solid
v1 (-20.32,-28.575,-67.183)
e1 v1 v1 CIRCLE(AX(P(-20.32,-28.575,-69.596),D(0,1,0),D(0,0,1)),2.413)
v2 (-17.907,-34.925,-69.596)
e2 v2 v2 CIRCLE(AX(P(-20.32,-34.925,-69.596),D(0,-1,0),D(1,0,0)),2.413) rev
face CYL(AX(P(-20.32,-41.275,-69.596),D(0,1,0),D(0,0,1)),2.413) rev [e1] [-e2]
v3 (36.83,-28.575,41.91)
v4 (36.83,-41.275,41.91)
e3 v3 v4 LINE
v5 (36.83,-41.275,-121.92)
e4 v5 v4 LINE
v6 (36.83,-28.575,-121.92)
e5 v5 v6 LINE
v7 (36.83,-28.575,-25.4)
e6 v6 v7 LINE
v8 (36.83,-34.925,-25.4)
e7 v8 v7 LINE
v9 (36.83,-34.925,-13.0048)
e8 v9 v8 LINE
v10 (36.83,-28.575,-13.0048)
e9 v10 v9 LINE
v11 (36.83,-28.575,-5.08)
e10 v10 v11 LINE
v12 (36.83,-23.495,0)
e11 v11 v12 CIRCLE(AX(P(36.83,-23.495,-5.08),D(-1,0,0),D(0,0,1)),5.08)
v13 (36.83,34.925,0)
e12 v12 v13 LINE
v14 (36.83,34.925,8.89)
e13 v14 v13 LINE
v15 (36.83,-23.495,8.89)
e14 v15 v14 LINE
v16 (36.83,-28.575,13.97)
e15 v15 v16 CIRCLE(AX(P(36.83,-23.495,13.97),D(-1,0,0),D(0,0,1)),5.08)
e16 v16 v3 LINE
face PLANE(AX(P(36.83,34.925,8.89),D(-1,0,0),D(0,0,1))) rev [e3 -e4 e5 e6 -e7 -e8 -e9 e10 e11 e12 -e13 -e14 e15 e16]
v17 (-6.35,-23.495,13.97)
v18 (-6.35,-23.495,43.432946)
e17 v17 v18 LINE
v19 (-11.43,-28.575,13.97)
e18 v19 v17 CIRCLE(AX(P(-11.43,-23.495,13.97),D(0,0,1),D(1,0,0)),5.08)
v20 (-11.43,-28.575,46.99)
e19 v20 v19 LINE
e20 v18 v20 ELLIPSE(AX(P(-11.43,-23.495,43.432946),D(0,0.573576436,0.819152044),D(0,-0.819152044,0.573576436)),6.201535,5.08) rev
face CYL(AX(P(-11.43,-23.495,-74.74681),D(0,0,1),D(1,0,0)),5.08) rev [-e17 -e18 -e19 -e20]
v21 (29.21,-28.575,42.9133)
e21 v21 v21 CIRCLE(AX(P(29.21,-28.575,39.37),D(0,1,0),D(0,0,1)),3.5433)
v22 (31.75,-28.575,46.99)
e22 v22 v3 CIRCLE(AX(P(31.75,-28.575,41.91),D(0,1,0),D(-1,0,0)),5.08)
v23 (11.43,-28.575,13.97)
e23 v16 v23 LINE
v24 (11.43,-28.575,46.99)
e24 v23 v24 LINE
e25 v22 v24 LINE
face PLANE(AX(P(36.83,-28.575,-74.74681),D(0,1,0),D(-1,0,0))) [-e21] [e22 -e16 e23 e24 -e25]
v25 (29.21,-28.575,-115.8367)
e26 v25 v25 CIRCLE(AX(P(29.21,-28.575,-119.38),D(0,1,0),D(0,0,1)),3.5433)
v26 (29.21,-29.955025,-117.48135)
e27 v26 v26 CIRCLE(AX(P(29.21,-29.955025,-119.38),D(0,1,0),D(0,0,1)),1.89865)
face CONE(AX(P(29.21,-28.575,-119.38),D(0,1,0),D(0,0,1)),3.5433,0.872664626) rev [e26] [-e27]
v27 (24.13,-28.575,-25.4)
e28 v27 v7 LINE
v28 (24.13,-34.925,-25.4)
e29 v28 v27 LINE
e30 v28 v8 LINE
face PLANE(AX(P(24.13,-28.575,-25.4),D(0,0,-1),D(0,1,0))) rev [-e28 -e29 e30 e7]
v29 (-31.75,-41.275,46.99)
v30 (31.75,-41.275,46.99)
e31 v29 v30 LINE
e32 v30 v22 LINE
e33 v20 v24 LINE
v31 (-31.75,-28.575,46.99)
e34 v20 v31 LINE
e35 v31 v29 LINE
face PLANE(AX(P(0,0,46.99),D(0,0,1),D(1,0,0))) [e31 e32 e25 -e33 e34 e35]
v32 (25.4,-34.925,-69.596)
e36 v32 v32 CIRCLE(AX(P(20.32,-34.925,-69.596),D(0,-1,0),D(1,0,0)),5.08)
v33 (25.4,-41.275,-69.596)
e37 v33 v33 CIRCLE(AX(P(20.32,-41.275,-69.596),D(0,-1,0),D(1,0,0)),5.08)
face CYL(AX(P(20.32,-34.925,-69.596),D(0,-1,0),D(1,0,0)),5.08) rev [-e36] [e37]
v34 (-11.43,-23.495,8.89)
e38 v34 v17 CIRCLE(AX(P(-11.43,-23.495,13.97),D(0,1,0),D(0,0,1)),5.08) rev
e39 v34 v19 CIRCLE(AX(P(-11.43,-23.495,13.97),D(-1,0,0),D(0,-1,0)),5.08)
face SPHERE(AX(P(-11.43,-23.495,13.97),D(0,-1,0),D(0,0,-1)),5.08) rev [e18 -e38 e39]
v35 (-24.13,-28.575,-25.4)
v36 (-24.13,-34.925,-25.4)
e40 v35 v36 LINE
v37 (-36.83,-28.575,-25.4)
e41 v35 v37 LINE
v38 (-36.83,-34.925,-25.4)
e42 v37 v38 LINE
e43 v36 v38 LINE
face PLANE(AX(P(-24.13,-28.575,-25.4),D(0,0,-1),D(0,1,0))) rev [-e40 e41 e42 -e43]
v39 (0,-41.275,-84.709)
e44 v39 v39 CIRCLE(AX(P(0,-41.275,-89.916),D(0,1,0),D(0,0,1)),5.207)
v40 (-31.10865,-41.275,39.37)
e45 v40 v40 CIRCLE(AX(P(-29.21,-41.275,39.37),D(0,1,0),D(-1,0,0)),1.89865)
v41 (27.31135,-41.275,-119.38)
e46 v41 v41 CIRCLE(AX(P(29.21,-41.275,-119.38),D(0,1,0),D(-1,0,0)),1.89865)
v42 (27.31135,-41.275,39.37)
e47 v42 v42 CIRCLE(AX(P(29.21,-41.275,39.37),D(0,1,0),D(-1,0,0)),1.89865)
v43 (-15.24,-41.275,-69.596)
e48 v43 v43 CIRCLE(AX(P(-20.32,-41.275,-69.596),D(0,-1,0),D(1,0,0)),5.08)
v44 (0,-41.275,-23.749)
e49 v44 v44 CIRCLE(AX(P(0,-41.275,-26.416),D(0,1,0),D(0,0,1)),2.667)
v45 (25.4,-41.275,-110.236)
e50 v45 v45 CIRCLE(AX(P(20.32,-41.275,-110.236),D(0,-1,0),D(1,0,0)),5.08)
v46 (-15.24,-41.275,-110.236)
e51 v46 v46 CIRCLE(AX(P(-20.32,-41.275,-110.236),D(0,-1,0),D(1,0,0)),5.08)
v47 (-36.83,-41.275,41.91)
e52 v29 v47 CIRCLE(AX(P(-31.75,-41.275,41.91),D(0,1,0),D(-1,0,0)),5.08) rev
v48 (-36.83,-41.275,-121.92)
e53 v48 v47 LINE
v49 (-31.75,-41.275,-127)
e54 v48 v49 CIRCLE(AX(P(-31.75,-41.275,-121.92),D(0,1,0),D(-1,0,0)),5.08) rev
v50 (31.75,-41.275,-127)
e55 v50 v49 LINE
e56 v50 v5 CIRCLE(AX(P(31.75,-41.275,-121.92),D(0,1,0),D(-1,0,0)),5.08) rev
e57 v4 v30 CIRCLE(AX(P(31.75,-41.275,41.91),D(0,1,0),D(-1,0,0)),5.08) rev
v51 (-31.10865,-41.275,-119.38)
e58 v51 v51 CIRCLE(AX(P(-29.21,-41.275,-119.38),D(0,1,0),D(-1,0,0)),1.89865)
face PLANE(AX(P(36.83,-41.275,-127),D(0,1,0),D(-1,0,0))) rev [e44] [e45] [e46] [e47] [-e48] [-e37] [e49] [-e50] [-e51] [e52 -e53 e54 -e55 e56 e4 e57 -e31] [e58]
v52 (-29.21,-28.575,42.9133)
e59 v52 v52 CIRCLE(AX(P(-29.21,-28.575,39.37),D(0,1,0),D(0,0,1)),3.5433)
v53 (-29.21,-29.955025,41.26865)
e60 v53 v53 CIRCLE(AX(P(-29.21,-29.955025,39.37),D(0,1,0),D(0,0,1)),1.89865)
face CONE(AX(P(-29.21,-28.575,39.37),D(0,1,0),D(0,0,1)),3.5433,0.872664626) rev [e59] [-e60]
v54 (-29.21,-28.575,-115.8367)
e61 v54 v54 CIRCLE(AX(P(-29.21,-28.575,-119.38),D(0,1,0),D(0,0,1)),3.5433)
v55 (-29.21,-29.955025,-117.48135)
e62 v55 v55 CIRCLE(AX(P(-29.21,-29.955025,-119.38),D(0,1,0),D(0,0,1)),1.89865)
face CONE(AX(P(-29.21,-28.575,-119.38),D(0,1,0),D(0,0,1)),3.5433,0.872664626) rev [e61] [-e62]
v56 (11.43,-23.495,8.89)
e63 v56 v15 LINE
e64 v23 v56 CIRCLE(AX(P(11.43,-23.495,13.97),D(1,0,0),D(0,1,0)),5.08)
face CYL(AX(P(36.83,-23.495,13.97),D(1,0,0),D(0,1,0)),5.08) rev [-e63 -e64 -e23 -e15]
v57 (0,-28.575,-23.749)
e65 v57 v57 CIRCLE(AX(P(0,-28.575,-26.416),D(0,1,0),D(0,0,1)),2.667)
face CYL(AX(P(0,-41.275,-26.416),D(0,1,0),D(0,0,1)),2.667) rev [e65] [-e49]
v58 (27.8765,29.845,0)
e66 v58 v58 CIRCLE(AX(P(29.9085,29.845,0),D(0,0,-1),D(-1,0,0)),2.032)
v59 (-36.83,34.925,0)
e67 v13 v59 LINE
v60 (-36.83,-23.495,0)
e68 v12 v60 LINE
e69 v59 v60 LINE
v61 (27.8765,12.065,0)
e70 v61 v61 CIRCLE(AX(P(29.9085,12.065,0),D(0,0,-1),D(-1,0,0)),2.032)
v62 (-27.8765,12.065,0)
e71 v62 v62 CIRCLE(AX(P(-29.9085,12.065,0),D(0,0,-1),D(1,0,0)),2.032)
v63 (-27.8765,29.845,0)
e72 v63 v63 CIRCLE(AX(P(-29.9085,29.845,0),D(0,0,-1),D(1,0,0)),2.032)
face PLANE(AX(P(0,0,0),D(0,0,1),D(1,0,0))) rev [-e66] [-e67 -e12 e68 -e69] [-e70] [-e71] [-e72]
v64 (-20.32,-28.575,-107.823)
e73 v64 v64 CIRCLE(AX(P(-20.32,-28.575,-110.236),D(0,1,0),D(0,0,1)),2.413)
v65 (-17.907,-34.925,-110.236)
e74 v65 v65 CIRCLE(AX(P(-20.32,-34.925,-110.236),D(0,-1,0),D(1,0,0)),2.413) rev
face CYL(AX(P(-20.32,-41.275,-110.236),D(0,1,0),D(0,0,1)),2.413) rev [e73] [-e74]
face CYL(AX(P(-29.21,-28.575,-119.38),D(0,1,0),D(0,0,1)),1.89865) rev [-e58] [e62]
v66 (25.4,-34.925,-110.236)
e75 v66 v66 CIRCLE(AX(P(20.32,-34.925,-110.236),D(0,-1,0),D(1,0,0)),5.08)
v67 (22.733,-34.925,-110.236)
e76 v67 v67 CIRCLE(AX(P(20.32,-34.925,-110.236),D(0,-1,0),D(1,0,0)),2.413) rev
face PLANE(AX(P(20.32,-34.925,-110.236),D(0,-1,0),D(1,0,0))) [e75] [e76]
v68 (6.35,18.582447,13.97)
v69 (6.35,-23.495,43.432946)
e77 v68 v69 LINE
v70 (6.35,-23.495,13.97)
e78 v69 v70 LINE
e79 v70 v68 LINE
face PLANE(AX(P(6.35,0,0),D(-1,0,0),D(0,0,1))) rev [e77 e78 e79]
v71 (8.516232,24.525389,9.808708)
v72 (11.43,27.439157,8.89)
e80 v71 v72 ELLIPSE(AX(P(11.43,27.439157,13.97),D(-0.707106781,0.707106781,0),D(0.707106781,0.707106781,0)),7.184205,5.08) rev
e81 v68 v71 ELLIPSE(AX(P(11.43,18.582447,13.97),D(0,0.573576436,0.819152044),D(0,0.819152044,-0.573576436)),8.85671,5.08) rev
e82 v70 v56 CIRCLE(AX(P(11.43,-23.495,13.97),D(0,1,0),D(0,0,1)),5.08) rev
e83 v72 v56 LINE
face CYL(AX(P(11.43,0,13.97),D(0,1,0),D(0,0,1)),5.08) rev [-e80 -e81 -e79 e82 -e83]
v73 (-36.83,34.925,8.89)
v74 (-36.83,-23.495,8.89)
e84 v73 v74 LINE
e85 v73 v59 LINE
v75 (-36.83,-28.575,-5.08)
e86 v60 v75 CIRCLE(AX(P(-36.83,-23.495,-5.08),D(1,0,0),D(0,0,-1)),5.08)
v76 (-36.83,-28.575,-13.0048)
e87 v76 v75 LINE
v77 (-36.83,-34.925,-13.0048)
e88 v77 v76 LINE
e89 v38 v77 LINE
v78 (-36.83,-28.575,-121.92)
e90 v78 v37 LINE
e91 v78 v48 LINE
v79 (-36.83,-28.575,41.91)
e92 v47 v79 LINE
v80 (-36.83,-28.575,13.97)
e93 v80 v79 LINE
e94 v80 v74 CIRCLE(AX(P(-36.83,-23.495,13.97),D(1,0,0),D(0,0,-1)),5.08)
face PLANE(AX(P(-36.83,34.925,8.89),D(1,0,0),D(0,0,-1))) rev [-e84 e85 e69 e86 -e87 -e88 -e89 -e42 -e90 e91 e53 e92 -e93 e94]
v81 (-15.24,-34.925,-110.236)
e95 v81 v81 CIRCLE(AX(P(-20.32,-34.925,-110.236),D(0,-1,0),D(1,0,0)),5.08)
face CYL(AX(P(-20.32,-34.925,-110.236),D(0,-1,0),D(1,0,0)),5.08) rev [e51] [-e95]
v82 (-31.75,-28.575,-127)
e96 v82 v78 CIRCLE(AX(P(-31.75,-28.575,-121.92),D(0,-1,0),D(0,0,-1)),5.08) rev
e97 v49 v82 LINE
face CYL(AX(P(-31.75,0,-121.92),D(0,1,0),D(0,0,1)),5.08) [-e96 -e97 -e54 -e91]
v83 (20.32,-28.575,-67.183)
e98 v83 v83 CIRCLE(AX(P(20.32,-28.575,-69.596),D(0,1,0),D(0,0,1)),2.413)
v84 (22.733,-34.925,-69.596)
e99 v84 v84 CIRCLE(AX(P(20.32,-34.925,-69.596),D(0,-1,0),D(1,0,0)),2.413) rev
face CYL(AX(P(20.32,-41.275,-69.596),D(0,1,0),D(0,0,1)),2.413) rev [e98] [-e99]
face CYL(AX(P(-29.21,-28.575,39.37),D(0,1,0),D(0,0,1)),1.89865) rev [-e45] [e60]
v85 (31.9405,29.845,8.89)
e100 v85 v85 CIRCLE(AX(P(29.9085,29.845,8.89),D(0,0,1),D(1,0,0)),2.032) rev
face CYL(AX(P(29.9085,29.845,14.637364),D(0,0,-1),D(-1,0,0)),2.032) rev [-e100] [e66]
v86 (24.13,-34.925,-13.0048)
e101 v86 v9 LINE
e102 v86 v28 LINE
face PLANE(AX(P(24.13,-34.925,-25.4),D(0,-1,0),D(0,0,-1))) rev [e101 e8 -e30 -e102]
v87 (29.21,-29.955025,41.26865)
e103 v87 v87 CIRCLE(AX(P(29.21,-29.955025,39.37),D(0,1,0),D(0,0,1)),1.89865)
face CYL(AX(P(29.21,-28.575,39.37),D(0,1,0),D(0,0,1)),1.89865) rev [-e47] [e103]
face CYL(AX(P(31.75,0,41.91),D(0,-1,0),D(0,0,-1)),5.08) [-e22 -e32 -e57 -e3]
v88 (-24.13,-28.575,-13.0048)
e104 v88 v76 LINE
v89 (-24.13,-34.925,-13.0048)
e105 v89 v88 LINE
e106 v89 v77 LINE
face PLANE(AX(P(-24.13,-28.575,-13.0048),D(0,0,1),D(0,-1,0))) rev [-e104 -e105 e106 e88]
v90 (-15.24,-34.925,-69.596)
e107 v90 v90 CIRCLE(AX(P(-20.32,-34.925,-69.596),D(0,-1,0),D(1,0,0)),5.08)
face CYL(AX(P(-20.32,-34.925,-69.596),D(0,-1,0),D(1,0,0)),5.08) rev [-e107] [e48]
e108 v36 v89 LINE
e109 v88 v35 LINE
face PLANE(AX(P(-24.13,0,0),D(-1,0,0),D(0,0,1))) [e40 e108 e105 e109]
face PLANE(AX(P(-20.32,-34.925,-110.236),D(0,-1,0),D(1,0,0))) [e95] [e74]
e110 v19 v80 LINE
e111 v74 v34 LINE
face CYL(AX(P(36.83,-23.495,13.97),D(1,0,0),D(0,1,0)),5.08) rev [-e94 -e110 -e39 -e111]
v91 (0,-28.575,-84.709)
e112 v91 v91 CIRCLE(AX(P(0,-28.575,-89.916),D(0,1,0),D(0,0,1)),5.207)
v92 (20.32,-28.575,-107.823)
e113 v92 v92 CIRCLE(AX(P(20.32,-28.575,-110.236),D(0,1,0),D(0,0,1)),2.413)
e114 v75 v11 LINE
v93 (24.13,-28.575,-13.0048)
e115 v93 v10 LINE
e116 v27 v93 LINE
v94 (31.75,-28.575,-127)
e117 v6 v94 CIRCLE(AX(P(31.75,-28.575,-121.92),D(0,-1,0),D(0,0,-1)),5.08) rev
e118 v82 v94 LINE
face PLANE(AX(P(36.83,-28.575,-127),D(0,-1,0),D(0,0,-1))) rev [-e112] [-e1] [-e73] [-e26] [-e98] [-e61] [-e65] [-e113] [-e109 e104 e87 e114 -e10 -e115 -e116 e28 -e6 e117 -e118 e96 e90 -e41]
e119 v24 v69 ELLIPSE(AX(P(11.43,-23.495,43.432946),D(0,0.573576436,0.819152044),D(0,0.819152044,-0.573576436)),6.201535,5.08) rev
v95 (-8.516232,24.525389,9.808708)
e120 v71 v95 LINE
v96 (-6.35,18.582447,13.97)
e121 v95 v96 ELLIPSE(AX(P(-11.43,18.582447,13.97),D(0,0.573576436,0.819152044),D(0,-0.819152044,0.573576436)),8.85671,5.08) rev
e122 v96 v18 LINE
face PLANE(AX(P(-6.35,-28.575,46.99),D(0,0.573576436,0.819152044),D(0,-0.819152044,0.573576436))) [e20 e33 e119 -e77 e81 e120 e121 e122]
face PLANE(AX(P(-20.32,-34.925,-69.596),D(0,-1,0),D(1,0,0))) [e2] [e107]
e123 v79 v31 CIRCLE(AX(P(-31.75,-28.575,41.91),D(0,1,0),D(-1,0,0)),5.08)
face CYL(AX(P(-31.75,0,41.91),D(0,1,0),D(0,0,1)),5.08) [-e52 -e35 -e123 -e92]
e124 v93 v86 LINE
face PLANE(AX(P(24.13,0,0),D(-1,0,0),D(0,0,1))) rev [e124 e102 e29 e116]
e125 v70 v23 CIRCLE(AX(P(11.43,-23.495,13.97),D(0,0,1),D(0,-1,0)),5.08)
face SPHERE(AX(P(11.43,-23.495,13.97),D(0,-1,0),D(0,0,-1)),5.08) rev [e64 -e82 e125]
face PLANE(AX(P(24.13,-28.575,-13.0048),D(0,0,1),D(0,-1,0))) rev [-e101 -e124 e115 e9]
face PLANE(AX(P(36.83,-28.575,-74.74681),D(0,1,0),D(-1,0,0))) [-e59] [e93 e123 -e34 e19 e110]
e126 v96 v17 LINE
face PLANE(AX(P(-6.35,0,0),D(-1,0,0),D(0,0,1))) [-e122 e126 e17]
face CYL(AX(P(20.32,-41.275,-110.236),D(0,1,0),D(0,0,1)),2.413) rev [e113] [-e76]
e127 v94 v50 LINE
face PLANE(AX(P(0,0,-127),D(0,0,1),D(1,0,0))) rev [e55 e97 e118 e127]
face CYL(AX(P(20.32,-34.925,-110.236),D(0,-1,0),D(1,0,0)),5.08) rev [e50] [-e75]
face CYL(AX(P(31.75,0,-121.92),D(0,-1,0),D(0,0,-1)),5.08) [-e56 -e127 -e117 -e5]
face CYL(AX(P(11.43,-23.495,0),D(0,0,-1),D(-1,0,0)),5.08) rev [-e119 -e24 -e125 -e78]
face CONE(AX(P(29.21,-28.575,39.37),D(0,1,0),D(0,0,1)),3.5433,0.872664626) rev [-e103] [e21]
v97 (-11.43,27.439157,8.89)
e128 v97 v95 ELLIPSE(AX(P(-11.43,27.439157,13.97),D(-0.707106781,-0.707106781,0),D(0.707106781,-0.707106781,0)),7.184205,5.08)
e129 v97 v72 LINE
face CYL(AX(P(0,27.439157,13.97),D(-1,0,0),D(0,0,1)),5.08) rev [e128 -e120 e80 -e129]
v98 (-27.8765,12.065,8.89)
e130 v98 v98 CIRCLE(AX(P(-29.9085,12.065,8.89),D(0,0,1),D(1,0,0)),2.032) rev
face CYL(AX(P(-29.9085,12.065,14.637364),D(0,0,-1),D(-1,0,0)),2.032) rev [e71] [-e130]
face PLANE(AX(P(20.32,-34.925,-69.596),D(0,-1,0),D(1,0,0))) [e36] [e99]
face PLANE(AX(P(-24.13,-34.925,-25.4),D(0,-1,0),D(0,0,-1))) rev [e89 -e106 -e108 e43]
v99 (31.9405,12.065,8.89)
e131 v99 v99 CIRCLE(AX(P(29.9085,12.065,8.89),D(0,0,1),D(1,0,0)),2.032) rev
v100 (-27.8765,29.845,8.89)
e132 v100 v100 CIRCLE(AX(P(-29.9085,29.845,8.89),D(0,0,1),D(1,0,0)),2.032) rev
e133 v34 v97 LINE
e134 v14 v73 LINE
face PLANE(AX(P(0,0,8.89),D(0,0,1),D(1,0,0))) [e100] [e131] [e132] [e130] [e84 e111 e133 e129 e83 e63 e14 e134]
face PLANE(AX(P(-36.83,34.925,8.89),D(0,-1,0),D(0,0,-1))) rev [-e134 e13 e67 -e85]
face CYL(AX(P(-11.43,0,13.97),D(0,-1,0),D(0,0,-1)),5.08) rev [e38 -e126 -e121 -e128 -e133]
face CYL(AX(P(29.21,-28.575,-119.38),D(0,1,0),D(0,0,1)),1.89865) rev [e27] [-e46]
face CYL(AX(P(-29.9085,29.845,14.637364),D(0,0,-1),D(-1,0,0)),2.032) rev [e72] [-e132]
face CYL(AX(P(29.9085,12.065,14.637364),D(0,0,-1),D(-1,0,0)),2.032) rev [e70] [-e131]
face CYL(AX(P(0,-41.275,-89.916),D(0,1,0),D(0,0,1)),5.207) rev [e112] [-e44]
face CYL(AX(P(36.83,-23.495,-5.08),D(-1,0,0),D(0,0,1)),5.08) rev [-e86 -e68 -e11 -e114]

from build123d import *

# Parameters (mm, degrees)
SKETCH1_W                                         = 73.66
SKETCH1_H                                         = 69.85
BOSS_EXTRUDE1_DEPTH                               = 8.89
SKETCH2_R                                         = 2.032
CUT_EXTRUDE1_DEPTH                                = 8.89
SKETCH3_W                                         = 73.66
SKETCH3_H                                         = 12.7
BOSS_EXTRUDE2_DEPTH                               = 127
BOSS_EXTRUDE3_DEPTH                               = 38.1
BOSS_EXTRUDE3_DEPTH_BACK                          = 135.89
SKETCH4_W                                         = 73.66
SKETCH4_H                                         = 12.7
BOSS_EXTRUDE4_START                               = -36.83
BOSS_EXTRUDE4_DEPTH                               = 6.35
SKETCH7_R                                         = 2.667
SKETCH7_R_2                                       = 5.207
SKETCH7_R_3                                       = 2.413
CUT_EXTRUDE2_DEPTH                                = 12.7
SKETCH27_W                                        = 12.3952
SKETCH27_H                                        = 6.35
CUT_EXTRUDE3_DEPTH                                = 12.7
SKETCH28_W                                        = 12.3952
SKETCH28_H                                        = 6.35
CUT_EXTRUDE4_DEPTH                                = 12.7
CSK_FOR_6_FLAT_HEAD_MACHINE_SCREW_100_D           = 3.7973
CSK_FOR_6_FLAT_HEAD_MACHINE_SCREW_100_CSINK_D     = 7.0866
CSK_FOR_6_FLAT_HEAD_MACHINE_SCREW_100_CSINK_ANGLE = 100
FILLET1_R                                         = 5.08
SKETCH35_R                                        = 5.08
CUT_EXTRUDE5_DEPTH                                = 6.35


with BuildPart() as part:
    # Sketch1 → Boss-Extrude1 (new body)
    with BuildSketch(Plane.XY):
        Rectangle(SKETCH1_W, SKETCH1_H)
    extrude(amount=BOSS_EXTRUDE1_DEPTH)

    # Sketch2 → Cut-Extrude1 (cut)
    with BuildSketch(Plane(origin=(0, 0, 0), x_dir=(-1, 0, 0), z_dir=(0, 0, -1))):
        with Locations((-29.9085, 29.845)):
            Circle(SKETCH2_R)
        with Locations((-29.9085, 12.065)):
            Circle(SKETCH2_R)
        with Locations(Location((29.9085, 12.065, 0), (0, 0, 180))):
            Circle(SKETCH2_R)
        with Locations(Location((29.9085, 29.845, 0), (0, 0, 180))):
            Circle(SKETCH2_R)
    extrude(amount=-CUT_EXTRUDE1_DEPTH, mode=Mode.SUBTRACT)

    # Sketch3 → Boss-Extrude2 (add)
    with BuildSketch(Plane(origin=(0, 0, 0), x_dir=(-1, 0, 0), z_dir=(0, 0, -1))):
        with Locations((0, -34.925)):
            Rectangle(SKETCH3_W, SKETCH3_H)
    extrude(amount=BOSS_EXTRUDE2_DEPTH)

    # Sketch4 → Boss-Extrude3 (add, two sides: drawn at the far end of the back side and taken through both)
    with BuildSketch(Plane.XY.offset(8.89).offset(-BOSS_EXTRUDE3_DEPTH_BACK)):
        with Locations((0, -34.925)):
            Rectangle(SKETCH4_W, SKETCH4_H)
    extrude(amount=BOSS_EXTRUDE3_DEPTH + BOSS_EXTRUDE3_DEPTH_BACK)

    # Sketch5 → Boss-Extrude4 (add, symmetric)
    with BuildSketch(Plane(origin=(36.83, 0, 0), x_dir=(0, 0, -1), z_dir=(1, 0, 0)).offset(BOSS_EXTRUDE4_START)):
        Polygon((-46.99, -28.575), (-8.89, 25.837439057), (-8.89, -28.575), align=None)
    extrude(amount=BOSS_EXTRUDE4_DEPTH, both=True)

    # Sketch7 → Cut-Extrude2 (cut)
    with BuildSketch(Plane(origin=(0, -28.575, 0), x_dir=(1, 0, 0), z_dir=(0, 1, 0))):
        with Locations(Location((0, 26.416, 0), (0, 0, 270))):
            Circle(SKETCH7_R)
        with Locations(Location((0, 89.916, 0), (0, 0, 270))):
            Circle(SKETCH7_R_2)
        with Locations(Location((-20.32, 69.596, 0), (0, 0, 270))):
            Circle(SKETCH7_R_3)
        with Locations(Location((20.32, 69.596, 0), (0, 0, 270))):
            Circle(SKETCH7_R_3)
        with Locations(Location((20.32, 110.236, 0), (0, 0, 270))):
            Circle(SKETCH7_R_3)
        with Locations(Location((-20.32, 110.236, 0), (0, 0, 270))):
            Circle(SKETCH7_R_3)
    extrude(amount=-CUT_EXTRUDE2_DEPTH, mode=Mode.SUBTRACT)

    # Sketch27 → Cut-Extrude3 (cut)
    with BuildSketch(Plane.ZY.offset(36.83)):
        with Locations((-19.2024, -31.75)):
            Rectangle(SKETCH27_W, SKETCH27_H)
    extrude(amount=-CUT_EXTRUDE3_DEPTH, mode=Mode.SUBTRACT)

    # Sketch28 → Cut-Extrude4 (cut)
    with BuildSketch(Plane(origin=(36.83, 0, 0), x_dir=(0, 0, -1), z_dir=(1, 0, 0))):
        with Locations((19.2024, -31.75)):
            Rectangle(SKETCH28_W, SKETCH28_H)
    extrude(amount=-CUT_EXTRUDE4_DEPTH, mode=Mode.SUBTRACT)

    # CSK for #6 Flat Head Machine Screw (100)1 (through all)
    with Locations(Plane(origin=(0, -28.575, 0), x_dir=(1, 0, 0), z_dir=(0, 1, 0))):
        with Locations((-29.21, -39.37), (29.21, -39.37), (29.21, 119.38), (-29.21, 119.38)):
            CounterSinkHole(CSK_FOR_6_FLAT_HEAD_MACHINE_SCREW_100_D / 2, CSK_FOR_6_FLAT_HEAD_MACHINE_SCREW_100_CSINK_D / 2, counter_sink_angle=CSK_FOR_6_FLAT_HEAD_MACHINE_SCREW_100_CSINK_ANGLE)

    # Fillet1
    fillet1_edges = [part.edges().sort_by_distance(p)[0] for p in [
        (0, -28.575, 0),
    ]]
    fillet(fillet1_edges, radius=FILLET1_R)
    fillet1_2_edges = [part.edges().sort_by_distance(p)[0] for p in [
        (-6.35, -1.368780472, 8.89),
    ]]
    fillet(fillet1_2_edges, radius=FILLET1_R)
    fillet1_3_edges = [part.edges().sort_by_distance(p)[0] for p in [
        (6.35, -1.368780472, 8.89),
    ]]
    fillet(fillet1_3_edges, radius=FILLET1_R)
    fillet1_4_edges = [part.edges().sort_by_distance(p)[0] for p in [
        (0, 25.837439057, 8.89),
    ]]
    fillet(fillet1_4_edges, radius=FILLET1_R)
    fillet1_5_edges = [part.edges().sort_by_distance(p)[0] for p in [
        (36.83, -34.925, -127),
    ]]
    fillet(fillet1_5_edges, radius=FILLET1_R)
    fillet1_6_edges = [part.edges().sort_by_distance(p)[0] for p in [
        (36.83, -34.925, 46.99),
    ]]
    fillet(fillet1_6_edges, radius=FILLET1_R)
    fillet1_7_edges = [part.edges().sort_by_distance(p)[0] for p in [
        (-36.83, -34.925, 46.99),
    ]]
    fillet(fillet1_7_edges, radius=FILLET1_R)
    fillet1_8_edges = [part.edges().sort_by_distance(p)[0] for p in [
        (-36.83, -34.925, -127),
    ]]
    fillet(fillet1_8_edges, radius=FILLET1_R)
    # the kernel refuses this fillet: 5.08 mm, written as the material it adds along each edge
    with BuildSketch(Plane(origin=(6.35, -28.575, 13.97), x_dir=(1, 0, 0), z_dir=(0, 0, 1))) as fillet1_9_piece_1_section:
        with BuildLine():
            CenterArc((FILLET1_R, FILLET1_R), FILLET1_R, 180, 90)
            Line((0, FILLET1_R), (-FILLET1_R * 0.02, FILLET1_R))
            Line((-FILLET1_R * 0.02, FILLET1_R), (-FILLET1_R * 0.02, -FILLET1_R * 0.02))
            Line((-FILLET1_R * 0.02, -FILLET1_R * 0.02), (FILLET1_R, -FILLET1_R * 0.02))
            Line((FILLET1_R, -FILLET1_R * 0.02), (FILLET1_R, 0))
        make_face()
    fillet1_9_piece_1 = extrude(amount=33.02, mode=Mode.PRIVATE)
    fillet1_9_piece_1 = split(fillet1_9_piece_1, bisect_by=Plane(origin=(7.515371232, -19.877941852, 40.900254324), z_dir=(0, -0.5735764363510472, -0.8191520442889911)), keep=Keep.TOP, mode=Mode.PRIVATE)
    add(fillet1_9_piece_1)
    with BuildSketch(Plane(origin=(11.43, -28.575, 13.97), x_dir=(0, 0, -1), z_dir=(1, 0, 0))) as fillet1_9_piece_2:
        with BuildLine():
            CenterArc((5.08 - FILLET1_R, FILLET1_R), FILLET1_R, 270, 90)
            Line((5.08, FILLET1_R), (5.08 + FILLET1_R * 0.02, FILLET1_R))
            Line((5.08 + FILLET1_R * 0.02, FILLET1_R), (5.08 + FILLET1_R * 0.02, 0))
            Line((5.08 + FILLET1_R * 0.02, 0), (5.08, -FILLET1_R * 0.02))
            Line((5.08, -FILLET1_R * 0.02), (5.08 - FILLET1_R, -FILLET1_R * 0.02))
            Line((5.08 - FILLET1_R, -FILLET1_R * 0.02), (5.08 - FILLET1_R, 0))
        make_face()
    revolve(axis=Axis((11.43, -28.575, 13.97), (0, 1, 0)), revolution_arc=90)
    with BuildSketch(Plane(origin=(11.43, -28.575, 8.89), x_dir=(0, 1, 0), z_dir=(1, 0, 0))) as fillet1_9_piece_3:
        with BuildLine():
            CenterArc((FILLET1_R, FILLET1_R), FILLET1_R, 180, 90)
            Line((0, FILLET1_R), (-FILLET1_R * 0.02, FILLET1_R))
            Line((-FILLET1_R * 0.02, FILLET1_R), (-FILLET1_R * 0.02, -FILLET1_R * 0.02))
            Line((-FILLET1_R * 0.02, -FILLET1_R * 0.02), (FILLET1_R, -FILLET1_R * 0.02))
            Line((FILLET1_R, -FILLET1_R * 0.02), (FILLET1_R, 0))
        make_face()
    extrude(amount=25.4)
    # the kernel refuses this fillet: 5.08 mm, written as the material it adds along each edge
    with BuildSketch(Plane(origin=(-6.35, -28.575, 13.97), x_dir=(-1, 0, 0), z_dir=(0, 0, 1))) as fillet1_10_piece_1_section:
        with BuildLine():
            CenterArc((FILLET1_R, -FILLET1_R), FILLET1_R, 90, 90)
            Line((0, -FILLET1_R), (-FILLET1_R * 0.02, -FILLET1_R))
            Line((-FILLET1_R * 0.02, -FILLET1_R), (-FILLET1_R * 0.02, FILLET1_R * 0.02))
            Line((-FILLET1_R * 0.02, FILLET1_R * 0.02), (FILLET1_R, FILLET1_R * 0.02))
            Line((FILLET1_R, FILLET1_R * 0.02), (FILLET1_R, 0))
        make_face()
    fillet1_10_piece_1 = extrude(amount=33.02, mode=Mode.PRIVATE)
    fillet1_10_piece_1 = split(fillet1_10_piece_1, bisect_by=Plane(origin=(-7.515371232, -19.877941852, 40.900254324), z_dir=(0, -0.5735764363510472, -0.8191520442889911)), keep=Keep.TOP, mode=Mode.PRIVATE)
    add(fillet1_10_piece_1)
    with BuildSketch(Plane(origin=(-11.43, -28.575, 13.97), x_dir=(0, 0, -1), z_dir=(-1, 0, 0))) as fillet1_10_piece_2:
        with BuildLine():
            CenterArc((5.08 - FILLET1_R, -FILLET1_R), FILLET1_R, 0, 90)
            Line((5.08, -FILLET1_R), (5.08 + FILLET1_R * 0.02, -FILLET1_R))
            Line((5.08 + FILLET1_R * 0.02, -FILLET1_R), (5.08 + FILLET1_R * 0.02, 0))
            Line((5.08 + FILLET1_R * 0.02, 0), (5.08, FILLET1_R * 0.02))
            Line((5.08, FILLET1_R * 0.02), (5.08 - FILLET1_R, FILLET1_R * 0.02))
            Line((5.08 - FILLET1_R, FILLET1_R * 0.02), (5.08 - FILLET1_R, 0))
        make_face()
    revolve(axis=Axis((-11.43, -28.575, 13.97), (0, -1, 0)), revolution_arc=90)
    with BuildSketch(Plane(origin=(-36.83, -28.575, 8.89), x_dir=(0, 0, 1), z_dir=(1, 0, 0))) as fillet1_10_piece_3:
        with BuildLine():
            CenterArc((FILLET1_R, -FILLET1_R), FILLET1_R, 90, 90)
            Line((0, -FILLET1_R), (-FILLET1_R * 0.02, -FILLET1_R))
            Line((-FILLET1_R * 0.02, -FILLET1_R), (-FILLET1_R * 0.02, FILLET1_R * 0.02))
            Line((-FILLET1_R * 0.02, FILLET1_R * 0.02), (FILLET1_R, FILLET1_R * 0.02))
            Line((FILLET1_R, FILLET1_R * 0.02), (FILLET1_R, 0))
        make_face()
    extrude(amount=25.4)

    # Sketch35 → Cut-Extrude5 (cut)
    with BuildSketch(Plane.XZ.offset(41.275)):
        with Locations((20.32, -110.236)):
            Circle(SKETCH35_R)
        with Locations((-20.32, -110.236)):
            Circle(SKETCH35_R)
        with Locations((-20.32, -69.596)):
            Circle(SKETCH35_R)
        with Locations((20.32, -69.596)):
            Circle(SKETCH35_R)
    extrude(amount=-CUT_EXTRUDE5_DEPTH, mode=Mode.SUBTRACT)


solid = part.part
